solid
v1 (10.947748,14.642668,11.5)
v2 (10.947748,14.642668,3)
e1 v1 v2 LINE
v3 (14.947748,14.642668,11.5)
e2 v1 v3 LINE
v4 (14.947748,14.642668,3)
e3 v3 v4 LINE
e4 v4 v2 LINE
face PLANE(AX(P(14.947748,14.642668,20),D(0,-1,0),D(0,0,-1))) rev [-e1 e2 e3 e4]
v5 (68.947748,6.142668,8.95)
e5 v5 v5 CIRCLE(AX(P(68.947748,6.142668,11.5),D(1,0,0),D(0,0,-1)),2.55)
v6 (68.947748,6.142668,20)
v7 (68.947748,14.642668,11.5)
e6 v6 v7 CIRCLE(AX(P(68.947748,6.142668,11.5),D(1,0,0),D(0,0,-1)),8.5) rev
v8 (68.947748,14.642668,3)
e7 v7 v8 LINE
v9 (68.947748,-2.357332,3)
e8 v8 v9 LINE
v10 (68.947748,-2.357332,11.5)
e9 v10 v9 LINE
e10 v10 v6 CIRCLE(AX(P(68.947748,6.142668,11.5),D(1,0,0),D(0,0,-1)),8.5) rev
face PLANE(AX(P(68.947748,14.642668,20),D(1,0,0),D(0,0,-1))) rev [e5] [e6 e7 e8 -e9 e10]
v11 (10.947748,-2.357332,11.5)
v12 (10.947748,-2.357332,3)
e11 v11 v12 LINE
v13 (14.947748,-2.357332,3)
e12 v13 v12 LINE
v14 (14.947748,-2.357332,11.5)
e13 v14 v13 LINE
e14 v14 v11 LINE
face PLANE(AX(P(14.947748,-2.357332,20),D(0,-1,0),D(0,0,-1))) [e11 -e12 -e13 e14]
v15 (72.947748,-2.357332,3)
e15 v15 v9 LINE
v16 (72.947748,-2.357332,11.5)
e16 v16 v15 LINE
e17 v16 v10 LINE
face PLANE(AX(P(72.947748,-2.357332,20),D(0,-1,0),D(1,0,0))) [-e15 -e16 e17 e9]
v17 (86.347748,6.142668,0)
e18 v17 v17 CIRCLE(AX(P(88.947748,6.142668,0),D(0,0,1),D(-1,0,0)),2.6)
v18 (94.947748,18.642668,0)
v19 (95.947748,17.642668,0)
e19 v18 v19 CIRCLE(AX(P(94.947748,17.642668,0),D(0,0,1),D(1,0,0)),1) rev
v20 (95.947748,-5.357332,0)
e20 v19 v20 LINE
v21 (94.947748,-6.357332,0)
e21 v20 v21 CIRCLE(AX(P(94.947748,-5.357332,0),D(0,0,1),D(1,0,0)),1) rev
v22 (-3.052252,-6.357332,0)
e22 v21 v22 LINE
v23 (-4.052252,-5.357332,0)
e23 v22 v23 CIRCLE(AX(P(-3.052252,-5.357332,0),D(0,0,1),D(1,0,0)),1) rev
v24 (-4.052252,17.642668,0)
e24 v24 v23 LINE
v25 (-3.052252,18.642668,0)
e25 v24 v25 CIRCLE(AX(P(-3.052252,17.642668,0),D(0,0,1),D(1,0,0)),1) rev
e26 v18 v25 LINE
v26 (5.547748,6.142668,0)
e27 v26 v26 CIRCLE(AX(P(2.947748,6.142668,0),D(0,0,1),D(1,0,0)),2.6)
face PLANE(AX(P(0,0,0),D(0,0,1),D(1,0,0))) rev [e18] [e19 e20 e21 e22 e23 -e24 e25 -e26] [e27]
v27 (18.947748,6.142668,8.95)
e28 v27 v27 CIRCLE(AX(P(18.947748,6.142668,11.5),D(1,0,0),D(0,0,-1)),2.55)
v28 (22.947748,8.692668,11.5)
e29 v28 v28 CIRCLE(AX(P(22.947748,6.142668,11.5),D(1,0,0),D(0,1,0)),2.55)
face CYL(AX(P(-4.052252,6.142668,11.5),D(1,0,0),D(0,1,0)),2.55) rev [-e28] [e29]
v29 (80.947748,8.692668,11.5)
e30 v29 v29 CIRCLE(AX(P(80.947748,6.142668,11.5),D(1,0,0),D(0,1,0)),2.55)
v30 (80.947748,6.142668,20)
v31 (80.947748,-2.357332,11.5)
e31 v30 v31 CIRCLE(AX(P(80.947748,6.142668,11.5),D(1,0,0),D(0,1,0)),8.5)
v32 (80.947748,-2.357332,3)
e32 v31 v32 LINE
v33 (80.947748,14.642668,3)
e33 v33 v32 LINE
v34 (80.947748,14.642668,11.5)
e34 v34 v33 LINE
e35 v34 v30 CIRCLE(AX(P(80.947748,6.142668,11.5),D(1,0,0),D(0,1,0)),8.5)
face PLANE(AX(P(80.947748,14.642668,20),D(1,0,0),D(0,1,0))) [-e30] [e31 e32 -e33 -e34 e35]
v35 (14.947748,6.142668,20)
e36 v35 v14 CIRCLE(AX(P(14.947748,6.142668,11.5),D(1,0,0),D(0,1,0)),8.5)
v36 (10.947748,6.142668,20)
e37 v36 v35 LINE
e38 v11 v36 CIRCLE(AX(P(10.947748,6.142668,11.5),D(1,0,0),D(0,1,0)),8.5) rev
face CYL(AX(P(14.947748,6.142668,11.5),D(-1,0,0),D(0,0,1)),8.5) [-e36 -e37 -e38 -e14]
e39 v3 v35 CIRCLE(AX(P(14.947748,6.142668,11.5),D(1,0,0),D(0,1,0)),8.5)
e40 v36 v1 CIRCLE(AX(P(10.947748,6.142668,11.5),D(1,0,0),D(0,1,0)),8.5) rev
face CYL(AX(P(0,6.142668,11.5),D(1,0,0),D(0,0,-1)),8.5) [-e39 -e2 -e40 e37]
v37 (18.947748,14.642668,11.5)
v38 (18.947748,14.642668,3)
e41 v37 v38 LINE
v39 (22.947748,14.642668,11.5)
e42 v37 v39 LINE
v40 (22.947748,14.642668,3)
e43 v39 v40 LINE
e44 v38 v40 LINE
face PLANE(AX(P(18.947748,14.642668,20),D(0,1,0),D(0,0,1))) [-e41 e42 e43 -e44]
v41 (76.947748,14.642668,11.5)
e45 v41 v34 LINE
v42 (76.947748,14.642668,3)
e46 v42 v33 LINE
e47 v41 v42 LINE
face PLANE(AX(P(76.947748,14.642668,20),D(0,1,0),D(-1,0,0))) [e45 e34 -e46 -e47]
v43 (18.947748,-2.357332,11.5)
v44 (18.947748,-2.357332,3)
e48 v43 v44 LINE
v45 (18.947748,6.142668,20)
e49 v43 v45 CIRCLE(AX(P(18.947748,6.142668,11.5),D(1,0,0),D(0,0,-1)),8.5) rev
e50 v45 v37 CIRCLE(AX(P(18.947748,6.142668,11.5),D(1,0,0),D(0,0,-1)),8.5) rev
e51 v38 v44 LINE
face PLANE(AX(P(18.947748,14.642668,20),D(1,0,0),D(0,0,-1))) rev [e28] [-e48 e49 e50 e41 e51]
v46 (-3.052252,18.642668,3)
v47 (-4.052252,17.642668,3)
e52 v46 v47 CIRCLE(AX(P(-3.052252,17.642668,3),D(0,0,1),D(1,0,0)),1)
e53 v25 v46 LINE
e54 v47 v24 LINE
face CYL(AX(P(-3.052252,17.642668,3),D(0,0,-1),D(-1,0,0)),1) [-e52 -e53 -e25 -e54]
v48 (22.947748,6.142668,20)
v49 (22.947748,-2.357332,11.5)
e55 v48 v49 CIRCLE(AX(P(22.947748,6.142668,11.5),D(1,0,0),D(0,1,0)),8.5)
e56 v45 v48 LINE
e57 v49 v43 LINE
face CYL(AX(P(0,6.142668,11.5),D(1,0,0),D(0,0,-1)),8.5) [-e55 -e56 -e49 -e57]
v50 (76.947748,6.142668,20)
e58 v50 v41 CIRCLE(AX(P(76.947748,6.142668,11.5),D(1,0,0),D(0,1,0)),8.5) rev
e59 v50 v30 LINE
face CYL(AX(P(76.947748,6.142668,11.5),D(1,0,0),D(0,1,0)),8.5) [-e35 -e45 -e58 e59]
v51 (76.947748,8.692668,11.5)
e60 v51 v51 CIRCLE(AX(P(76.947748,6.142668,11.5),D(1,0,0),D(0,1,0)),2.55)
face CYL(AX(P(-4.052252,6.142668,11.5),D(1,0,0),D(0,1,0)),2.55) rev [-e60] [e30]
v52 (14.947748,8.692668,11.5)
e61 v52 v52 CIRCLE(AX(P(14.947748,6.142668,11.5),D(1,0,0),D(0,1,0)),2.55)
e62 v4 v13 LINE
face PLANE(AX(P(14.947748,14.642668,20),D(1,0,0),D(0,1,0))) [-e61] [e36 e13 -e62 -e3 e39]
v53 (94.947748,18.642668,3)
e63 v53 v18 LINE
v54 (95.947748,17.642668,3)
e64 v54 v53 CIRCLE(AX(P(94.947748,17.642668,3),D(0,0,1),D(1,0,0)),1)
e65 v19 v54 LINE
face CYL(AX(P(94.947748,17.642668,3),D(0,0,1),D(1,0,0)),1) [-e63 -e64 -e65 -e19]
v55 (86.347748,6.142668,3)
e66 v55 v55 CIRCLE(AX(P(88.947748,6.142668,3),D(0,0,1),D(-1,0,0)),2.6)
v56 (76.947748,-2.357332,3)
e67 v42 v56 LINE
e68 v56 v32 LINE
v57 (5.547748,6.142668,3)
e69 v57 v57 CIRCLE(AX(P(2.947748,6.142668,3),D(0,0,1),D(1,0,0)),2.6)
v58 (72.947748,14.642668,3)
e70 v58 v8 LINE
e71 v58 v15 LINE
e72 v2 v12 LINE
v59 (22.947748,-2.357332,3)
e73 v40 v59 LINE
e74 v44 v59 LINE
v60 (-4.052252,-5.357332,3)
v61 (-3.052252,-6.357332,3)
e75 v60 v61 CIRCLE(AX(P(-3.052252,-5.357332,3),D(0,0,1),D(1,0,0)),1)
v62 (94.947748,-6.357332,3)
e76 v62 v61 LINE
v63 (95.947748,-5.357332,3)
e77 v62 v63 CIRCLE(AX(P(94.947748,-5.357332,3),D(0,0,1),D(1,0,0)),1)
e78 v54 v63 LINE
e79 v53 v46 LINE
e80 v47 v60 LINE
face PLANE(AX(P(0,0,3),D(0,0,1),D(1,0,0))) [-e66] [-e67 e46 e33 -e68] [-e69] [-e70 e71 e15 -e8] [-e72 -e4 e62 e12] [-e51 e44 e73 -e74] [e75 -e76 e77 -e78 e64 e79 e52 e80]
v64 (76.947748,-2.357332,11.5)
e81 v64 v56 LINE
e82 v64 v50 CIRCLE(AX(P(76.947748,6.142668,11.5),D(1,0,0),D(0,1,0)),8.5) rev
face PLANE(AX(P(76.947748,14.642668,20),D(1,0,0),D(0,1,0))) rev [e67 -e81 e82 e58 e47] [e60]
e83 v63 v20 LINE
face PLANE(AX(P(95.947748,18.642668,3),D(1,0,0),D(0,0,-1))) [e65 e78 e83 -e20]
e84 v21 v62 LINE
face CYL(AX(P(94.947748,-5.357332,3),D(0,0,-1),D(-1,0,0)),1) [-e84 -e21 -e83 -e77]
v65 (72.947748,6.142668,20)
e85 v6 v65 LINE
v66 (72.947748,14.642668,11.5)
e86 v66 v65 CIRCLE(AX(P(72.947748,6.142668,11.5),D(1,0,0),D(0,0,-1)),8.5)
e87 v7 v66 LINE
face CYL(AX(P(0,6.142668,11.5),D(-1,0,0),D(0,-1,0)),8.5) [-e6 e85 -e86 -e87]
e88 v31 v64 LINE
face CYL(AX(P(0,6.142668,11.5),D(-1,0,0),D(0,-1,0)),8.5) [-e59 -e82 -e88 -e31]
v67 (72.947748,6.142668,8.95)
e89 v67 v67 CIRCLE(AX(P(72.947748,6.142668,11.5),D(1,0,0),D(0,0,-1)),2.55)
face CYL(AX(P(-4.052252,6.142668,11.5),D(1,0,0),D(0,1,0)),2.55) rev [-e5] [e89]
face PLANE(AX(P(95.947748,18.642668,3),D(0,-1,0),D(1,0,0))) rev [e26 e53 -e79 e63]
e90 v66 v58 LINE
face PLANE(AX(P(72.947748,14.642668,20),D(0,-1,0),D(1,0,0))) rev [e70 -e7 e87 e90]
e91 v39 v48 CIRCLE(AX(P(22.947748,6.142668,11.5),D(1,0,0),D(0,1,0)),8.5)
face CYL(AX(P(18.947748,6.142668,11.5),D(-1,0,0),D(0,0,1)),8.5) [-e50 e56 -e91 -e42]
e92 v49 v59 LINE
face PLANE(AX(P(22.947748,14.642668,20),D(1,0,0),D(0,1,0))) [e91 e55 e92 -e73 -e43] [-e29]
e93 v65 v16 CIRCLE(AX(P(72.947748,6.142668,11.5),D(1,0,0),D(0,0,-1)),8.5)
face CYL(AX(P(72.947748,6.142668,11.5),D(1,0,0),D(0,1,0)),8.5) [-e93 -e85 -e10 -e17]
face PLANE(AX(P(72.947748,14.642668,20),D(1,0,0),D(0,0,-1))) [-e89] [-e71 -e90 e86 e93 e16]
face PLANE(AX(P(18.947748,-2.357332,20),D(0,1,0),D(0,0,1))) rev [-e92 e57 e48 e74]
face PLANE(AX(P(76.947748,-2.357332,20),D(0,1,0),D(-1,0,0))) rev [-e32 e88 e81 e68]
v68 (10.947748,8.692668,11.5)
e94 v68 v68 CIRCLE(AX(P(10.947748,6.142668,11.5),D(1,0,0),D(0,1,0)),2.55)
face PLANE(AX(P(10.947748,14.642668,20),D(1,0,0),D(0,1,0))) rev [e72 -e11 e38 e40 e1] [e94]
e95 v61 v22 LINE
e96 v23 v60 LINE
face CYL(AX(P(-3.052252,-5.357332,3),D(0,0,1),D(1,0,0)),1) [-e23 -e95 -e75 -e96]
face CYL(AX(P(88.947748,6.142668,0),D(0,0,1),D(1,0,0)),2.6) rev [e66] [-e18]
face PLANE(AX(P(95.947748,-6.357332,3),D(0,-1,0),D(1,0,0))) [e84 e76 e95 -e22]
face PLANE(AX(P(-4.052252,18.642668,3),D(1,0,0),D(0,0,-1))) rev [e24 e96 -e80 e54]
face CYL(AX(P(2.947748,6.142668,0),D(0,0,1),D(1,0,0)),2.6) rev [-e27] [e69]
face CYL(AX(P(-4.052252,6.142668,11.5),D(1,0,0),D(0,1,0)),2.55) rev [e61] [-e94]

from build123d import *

# Parameters (mm, degrees)
SKIZZE1_W                            = 100
SKIZZE1_H                            = 25
AUFSATZ_LINEAR_AUSTRAGEN1_DEPTH      = 3
SKIZZE3_W                            = 4
SKIZZE3_H                            = 17
AUFSATZ_LINEAR_AUSTRAGEN2_DEPTH      = 17
SCHNITT_LINEAR_AUSTRAGEN1_DEPTH      = 78.95222289
SCHNITT_LINEAR_AUSTRAGEN1_DEPTH_BACK = 78.95222289
SKIZZE5_R                            = 2.55
VERRUNDUNG1_R                        = 8.5
SKIZZE6_R                            = 2.6
SCHNITT_LINEAR_AUSTRAGEN2_DEPTH      = 3
VERRUNDUNG2_R                        = 1


with BuildPart() as part:
    # Skizze1 → Aufsatz-Linear austragen1 (new body)
    with BuildSketch(Plane.XY):
        with Locations((45.947748482, 6.142667555)):
            Rectangle(SKIZZE1_W, SKIZZE1_H)
    extrude(amount=AUFSATZ_LINEAR_AUSTRAGEN1_DEPTH)

    # Skizze3 → Aufsatz-Linear austragen2 (add)
    with BuildSketch(Plane.XY.offset(3)):
        with Locations((12.947748482, 6.142667555)):
            Rectangle(SKIZZE3_W, SKIZZE3_H)
        with Locations((20.947748482, 6.142667555)):
            Rectangle(SKIZZE3_W, SKIZZE3_H)
        with Locations((78.947748482, 6.142667555)):
            Rectangle(SKIZZE3_W, SKIZZE3_H)
        with Locations((70.947748482, 6.142667555)):
            Rectangle(SKIZZE3_W, SKIZZE3_H)
    extrude(amount=AUFSATZ_LINEAR_AUSTRAGEN2_DEPTH)

    # Skizze5 → Schnitt-Linear austragen1 (cut, two sides: drawn at the far end of the back side and taken through both)
    with BuildSketch(Plane(origin=(22.947748482, 0, 0), x_dir=(0, 0, -1), z_dir=(1, 0, 0)).offset(-SCHNITT_LINEAR_AUSTRAGEN1_DEPTH_BACK)):
        with Locations(Location((-11.5, 6.142667555, 0), (0, 0, 90))):
            Circle(SKIZZE5_R)
    extrude(amount=SCHNITT_LINEAR_AUSTRAGEN1_DEPTH + SCHNITT_LINEAR_AUSTRAGEN1_DEPTH_BACK, mode=Mode.SUBTRACT)

    # Verrundung1
    verrundung1_edges = [part.edges().sort_by_distance(p)[0] for p in [
        (20.947748482, 14.642667555, 20),
        (12.947748482, 14.642667555, 20),
        (12.947748482, -2.357332445, 20),
        (20.947748482, -2.357332445, 20),
        (78.947748482, 14.642667555, 20),
        (70.947748482, 14.642667555, 20),
        (70.947748482, -2.357332445, 20),
        (78.947748482, -2.357332445, 20),
    ]]
    fillet(verrundung1_edges, radius=VERRUNDUNG1_R - 0.0001)  # a hair under: the kernel refuses the full size

    # Skizze6 → Schnitt-Linear austragen2 (cut)
    with BuildSketch(Plane.XY.offset(3)):
        with Locations((2.947748482, 6.142667555)):
            Circle(SKIZZE6_R)
        with Locations(Location((88.947748482, 6.142667555, 0), (0, 0, 180))):
            Circle(SKIZZE6_R)
    extrude(amount=-SCHNITT_LINEAR_AUSTRAGEN2_DEPTH, mode=Mode.SUBTRACT)

    # Verrundung2
    verrundung2_edges = [part.edges().sort_by_distance(p)[0] for p in [
        (95.947748482, -6.357332445, 1.5),
        (95.947748482, 18.642667555, 1.5),
        (-4.052251518, 18.642667555, 1.5),
        (-4.052251518, -6.357332445, 1.5),
    ]]
    fillet(verrundung2_edges, radius=VERRUNDUNG2_R)


solid = part.part
